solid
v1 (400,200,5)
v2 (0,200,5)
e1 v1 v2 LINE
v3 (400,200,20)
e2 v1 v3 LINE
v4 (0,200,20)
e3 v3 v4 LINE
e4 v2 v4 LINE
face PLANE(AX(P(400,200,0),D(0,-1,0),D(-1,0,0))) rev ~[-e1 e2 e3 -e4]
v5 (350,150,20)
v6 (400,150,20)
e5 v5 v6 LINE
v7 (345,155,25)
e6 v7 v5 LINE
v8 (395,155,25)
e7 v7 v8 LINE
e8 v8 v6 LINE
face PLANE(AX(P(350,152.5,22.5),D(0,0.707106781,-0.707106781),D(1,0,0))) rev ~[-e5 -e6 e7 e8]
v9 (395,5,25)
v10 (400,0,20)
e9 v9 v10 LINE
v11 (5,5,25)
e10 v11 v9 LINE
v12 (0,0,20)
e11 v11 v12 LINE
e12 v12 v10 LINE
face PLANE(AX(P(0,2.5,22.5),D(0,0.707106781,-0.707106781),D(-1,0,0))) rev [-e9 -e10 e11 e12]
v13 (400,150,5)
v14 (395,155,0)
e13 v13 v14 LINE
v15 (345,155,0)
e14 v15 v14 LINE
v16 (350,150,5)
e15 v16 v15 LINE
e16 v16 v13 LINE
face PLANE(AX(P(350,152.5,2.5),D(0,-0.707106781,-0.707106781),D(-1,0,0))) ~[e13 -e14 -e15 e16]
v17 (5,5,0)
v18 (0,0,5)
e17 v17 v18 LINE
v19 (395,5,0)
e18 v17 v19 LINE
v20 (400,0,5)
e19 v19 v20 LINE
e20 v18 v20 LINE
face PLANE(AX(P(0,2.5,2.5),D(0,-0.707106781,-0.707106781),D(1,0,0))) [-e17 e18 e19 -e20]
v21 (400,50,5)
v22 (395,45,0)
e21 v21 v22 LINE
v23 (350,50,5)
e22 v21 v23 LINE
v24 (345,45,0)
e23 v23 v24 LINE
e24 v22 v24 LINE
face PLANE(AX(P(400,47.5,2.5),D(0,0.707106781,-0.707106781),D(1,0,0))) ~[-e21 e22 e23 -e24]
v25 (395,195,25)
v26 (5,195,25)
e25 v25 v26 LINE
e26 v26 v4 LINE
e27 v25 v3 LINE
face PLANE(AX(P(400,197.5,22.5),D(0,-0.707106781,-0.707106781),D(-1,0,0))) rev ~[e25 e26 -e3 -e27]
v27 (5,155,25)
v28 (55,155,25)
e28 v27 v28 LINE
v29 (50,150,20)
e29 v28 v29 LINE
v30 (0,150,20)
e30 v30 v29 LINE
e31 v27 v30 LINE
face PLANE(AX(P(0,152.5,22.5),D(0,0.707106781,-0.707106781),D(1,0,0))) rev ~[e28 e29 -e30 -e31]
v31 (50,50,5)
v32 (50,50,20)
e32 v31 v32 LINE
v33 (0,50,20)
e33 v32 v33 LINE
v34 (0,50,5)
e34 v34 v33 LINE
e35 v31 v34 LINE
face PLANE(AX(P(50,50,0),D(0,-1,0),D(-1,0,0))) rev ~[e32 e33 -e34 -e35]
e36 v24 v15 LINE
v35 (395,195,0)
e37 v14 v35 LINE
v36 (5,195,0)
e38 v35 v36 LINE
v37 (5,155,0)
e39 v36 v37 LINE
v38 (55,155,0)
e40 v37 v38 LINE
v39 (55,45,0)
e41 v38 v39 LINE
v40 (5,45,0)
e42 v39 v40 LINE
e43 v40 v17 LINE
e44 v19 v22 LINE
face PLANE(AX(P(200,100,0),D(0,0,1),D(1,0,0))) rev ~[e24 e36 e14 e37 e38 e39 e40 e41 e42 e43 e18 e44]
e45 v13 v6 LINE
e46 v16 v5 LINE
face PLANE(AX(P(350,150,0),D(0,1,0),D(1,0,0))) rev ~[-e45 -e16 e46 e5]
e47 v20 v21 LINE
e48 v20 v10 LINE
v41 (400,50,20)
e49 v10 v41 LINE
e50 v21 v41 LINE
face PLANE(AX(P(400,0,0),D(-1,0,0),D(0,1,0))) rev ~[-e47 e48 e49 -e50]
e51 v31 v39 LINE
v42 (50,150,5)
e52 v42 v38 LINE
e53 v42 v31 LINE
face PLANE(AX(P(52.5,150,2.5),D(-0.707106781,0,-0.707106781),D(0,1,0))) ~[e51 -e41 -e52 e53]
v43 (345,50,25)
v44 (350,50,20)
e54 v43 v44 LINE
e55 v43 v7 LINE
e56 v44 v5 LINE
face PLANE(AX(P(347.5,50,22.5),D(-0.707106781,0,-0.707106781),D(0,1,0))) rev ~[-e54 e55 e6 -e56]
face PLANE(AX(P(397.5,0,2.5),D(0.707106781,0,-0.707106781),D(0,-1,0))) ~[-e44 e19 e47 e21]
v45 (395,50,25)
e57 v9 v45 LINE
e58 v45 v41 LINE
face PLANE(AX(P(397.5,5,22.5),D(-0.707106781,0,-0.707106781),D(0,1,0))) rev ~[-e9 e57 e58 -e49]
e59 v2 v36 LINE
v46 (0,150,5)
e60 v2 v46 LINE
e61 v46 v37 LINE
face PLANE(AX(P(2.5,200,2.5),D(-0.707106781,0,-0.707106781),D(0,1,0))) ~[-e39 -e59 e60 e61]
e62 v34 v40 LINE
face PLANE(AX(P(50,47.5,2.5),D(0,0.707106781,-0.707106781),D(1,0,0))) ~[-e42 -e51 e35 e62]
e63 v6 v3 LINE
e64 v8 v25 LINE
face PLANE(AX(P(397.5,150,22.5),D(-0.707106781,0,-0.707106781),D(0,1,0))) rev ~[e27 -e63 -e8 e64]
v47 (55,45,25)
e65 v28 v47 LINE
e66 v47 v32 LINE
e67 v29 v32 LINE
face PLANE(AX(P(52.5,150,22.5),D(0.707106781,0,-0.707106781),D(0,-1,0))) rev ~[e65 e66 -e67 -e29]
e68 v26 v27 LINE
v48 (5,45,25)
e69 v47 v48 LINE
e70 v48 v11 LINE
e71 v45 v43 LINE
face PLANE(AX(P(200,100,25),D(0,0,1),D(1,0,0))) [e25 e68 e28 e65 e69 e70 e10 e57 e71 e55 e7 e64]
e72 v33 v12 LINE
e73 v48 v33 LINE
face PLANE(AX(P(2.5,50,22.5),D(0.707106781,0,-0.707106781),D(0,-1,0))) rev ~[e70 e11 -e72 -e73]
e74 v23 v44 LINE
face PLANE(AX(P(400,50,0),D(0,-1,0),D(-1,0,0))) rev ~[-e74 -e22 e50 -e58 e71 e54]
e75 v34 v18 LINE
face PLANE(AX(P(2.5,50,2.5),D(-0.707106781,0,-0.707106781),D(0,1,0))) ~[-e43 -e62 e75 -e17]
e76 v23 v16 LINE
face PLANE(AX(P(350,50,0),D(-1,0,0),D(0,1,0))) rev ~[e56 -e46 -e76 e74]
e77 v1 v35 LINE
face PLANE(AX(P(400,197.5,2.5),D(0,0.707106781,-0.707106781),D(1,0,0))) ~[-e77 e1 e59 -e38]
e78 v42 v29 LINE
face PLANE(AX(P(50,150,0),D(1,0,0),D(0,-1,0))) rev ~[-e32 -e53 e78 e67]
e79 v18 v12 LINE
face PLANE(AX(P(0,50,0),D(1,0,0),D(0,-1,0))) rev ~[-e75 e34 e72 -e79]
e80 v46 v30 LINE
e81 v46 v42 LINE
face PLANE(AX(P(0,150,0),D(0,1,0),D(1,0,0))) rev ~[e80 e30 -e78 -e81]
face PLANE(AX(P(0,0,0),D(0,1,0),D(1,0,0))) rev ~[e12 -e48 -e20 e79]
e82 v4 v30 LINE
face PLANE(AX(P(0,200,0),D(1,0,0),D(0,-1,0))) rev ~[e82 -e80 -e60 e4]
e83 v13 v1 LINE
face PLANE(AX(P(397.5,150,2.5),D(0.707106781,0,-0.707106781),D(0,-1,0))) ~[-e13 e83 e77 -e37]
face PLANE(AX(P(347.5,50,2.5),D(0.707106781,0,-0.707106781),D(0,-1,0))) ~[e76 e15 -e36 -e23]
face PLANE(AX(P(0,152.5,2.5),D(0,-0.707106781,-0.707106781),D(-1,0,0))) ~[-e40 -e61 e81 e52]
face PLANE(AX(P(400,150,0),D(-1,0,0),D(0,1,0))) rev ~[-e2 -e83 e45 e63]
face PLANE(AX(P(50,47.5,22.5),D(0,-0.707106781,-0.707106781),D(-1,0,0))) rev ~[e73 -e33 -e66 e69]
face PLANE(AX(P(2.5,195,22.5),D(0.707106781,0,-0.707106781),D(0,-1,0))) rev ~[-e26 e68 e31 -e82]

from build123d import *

# Parameters (mm, degrees)
F1_DEPTH = 25
F2_SIZE  = 5
F3_SIZE  = 5
F5_SIZE  = 5


# Not quite as in the source:
# - a feature of the source that left no trace in its solid (it failed there, or was rolled back) is left out


with BuildPart() as f1:
    # F0 (on Top) → F1 (new body)
    with BuildSketch(Plane.XY):
        Polygon((0, 50), (0, 0), (400, 0), (400, 50), (350, 50), (350, 150), (400, 150), (400, 200), (0, 200), (0, 150), (50, 150), (50, 50), align=None)
    extrude(amount=F1_DEPTH)

    # F2
    f2_edges = [f1.edges().sort_by_distance(p)[0] for p in [
        (200, 0, 25),
    ]]
    chamfer(f2_edges, length=F2_SIZE)

    # F3
    f3_edges = [f1.edges().sort_by_distance(p)[0] for p in [
        (200, 200, 25),
    ]]
    chamfer(f3_edges, length=F3_SIZE)

    # F5
    f5_edges = [f1.edges().sort_by_distance(p)[0] for p in [
        (200, 0, 0),
        (200, 200, 0),
        (350, 100, 0),
        (375, 50, 0),
        (400, 25, 0),
        (400, 175, 0),
        (375, 150, 0),
        (0, 175, 0),
        (25, 150, 0),
        (50, 100, 0),
        (25, 50, 0),
        (0, 25, 0),
        (0, 172.5, 25),
        (25, 150, 25),
        (400, 172.5, 25),
        (50, 100, 25),
        (375, 150, 25),
        (25, 50, 25),
        (350, 100, 25),
        (0, 27.5, 25),
        (400, 27.5, 25),
    ]]
    chamfer(f5_edges, length=F5_SIZE)


solid = f1.part
